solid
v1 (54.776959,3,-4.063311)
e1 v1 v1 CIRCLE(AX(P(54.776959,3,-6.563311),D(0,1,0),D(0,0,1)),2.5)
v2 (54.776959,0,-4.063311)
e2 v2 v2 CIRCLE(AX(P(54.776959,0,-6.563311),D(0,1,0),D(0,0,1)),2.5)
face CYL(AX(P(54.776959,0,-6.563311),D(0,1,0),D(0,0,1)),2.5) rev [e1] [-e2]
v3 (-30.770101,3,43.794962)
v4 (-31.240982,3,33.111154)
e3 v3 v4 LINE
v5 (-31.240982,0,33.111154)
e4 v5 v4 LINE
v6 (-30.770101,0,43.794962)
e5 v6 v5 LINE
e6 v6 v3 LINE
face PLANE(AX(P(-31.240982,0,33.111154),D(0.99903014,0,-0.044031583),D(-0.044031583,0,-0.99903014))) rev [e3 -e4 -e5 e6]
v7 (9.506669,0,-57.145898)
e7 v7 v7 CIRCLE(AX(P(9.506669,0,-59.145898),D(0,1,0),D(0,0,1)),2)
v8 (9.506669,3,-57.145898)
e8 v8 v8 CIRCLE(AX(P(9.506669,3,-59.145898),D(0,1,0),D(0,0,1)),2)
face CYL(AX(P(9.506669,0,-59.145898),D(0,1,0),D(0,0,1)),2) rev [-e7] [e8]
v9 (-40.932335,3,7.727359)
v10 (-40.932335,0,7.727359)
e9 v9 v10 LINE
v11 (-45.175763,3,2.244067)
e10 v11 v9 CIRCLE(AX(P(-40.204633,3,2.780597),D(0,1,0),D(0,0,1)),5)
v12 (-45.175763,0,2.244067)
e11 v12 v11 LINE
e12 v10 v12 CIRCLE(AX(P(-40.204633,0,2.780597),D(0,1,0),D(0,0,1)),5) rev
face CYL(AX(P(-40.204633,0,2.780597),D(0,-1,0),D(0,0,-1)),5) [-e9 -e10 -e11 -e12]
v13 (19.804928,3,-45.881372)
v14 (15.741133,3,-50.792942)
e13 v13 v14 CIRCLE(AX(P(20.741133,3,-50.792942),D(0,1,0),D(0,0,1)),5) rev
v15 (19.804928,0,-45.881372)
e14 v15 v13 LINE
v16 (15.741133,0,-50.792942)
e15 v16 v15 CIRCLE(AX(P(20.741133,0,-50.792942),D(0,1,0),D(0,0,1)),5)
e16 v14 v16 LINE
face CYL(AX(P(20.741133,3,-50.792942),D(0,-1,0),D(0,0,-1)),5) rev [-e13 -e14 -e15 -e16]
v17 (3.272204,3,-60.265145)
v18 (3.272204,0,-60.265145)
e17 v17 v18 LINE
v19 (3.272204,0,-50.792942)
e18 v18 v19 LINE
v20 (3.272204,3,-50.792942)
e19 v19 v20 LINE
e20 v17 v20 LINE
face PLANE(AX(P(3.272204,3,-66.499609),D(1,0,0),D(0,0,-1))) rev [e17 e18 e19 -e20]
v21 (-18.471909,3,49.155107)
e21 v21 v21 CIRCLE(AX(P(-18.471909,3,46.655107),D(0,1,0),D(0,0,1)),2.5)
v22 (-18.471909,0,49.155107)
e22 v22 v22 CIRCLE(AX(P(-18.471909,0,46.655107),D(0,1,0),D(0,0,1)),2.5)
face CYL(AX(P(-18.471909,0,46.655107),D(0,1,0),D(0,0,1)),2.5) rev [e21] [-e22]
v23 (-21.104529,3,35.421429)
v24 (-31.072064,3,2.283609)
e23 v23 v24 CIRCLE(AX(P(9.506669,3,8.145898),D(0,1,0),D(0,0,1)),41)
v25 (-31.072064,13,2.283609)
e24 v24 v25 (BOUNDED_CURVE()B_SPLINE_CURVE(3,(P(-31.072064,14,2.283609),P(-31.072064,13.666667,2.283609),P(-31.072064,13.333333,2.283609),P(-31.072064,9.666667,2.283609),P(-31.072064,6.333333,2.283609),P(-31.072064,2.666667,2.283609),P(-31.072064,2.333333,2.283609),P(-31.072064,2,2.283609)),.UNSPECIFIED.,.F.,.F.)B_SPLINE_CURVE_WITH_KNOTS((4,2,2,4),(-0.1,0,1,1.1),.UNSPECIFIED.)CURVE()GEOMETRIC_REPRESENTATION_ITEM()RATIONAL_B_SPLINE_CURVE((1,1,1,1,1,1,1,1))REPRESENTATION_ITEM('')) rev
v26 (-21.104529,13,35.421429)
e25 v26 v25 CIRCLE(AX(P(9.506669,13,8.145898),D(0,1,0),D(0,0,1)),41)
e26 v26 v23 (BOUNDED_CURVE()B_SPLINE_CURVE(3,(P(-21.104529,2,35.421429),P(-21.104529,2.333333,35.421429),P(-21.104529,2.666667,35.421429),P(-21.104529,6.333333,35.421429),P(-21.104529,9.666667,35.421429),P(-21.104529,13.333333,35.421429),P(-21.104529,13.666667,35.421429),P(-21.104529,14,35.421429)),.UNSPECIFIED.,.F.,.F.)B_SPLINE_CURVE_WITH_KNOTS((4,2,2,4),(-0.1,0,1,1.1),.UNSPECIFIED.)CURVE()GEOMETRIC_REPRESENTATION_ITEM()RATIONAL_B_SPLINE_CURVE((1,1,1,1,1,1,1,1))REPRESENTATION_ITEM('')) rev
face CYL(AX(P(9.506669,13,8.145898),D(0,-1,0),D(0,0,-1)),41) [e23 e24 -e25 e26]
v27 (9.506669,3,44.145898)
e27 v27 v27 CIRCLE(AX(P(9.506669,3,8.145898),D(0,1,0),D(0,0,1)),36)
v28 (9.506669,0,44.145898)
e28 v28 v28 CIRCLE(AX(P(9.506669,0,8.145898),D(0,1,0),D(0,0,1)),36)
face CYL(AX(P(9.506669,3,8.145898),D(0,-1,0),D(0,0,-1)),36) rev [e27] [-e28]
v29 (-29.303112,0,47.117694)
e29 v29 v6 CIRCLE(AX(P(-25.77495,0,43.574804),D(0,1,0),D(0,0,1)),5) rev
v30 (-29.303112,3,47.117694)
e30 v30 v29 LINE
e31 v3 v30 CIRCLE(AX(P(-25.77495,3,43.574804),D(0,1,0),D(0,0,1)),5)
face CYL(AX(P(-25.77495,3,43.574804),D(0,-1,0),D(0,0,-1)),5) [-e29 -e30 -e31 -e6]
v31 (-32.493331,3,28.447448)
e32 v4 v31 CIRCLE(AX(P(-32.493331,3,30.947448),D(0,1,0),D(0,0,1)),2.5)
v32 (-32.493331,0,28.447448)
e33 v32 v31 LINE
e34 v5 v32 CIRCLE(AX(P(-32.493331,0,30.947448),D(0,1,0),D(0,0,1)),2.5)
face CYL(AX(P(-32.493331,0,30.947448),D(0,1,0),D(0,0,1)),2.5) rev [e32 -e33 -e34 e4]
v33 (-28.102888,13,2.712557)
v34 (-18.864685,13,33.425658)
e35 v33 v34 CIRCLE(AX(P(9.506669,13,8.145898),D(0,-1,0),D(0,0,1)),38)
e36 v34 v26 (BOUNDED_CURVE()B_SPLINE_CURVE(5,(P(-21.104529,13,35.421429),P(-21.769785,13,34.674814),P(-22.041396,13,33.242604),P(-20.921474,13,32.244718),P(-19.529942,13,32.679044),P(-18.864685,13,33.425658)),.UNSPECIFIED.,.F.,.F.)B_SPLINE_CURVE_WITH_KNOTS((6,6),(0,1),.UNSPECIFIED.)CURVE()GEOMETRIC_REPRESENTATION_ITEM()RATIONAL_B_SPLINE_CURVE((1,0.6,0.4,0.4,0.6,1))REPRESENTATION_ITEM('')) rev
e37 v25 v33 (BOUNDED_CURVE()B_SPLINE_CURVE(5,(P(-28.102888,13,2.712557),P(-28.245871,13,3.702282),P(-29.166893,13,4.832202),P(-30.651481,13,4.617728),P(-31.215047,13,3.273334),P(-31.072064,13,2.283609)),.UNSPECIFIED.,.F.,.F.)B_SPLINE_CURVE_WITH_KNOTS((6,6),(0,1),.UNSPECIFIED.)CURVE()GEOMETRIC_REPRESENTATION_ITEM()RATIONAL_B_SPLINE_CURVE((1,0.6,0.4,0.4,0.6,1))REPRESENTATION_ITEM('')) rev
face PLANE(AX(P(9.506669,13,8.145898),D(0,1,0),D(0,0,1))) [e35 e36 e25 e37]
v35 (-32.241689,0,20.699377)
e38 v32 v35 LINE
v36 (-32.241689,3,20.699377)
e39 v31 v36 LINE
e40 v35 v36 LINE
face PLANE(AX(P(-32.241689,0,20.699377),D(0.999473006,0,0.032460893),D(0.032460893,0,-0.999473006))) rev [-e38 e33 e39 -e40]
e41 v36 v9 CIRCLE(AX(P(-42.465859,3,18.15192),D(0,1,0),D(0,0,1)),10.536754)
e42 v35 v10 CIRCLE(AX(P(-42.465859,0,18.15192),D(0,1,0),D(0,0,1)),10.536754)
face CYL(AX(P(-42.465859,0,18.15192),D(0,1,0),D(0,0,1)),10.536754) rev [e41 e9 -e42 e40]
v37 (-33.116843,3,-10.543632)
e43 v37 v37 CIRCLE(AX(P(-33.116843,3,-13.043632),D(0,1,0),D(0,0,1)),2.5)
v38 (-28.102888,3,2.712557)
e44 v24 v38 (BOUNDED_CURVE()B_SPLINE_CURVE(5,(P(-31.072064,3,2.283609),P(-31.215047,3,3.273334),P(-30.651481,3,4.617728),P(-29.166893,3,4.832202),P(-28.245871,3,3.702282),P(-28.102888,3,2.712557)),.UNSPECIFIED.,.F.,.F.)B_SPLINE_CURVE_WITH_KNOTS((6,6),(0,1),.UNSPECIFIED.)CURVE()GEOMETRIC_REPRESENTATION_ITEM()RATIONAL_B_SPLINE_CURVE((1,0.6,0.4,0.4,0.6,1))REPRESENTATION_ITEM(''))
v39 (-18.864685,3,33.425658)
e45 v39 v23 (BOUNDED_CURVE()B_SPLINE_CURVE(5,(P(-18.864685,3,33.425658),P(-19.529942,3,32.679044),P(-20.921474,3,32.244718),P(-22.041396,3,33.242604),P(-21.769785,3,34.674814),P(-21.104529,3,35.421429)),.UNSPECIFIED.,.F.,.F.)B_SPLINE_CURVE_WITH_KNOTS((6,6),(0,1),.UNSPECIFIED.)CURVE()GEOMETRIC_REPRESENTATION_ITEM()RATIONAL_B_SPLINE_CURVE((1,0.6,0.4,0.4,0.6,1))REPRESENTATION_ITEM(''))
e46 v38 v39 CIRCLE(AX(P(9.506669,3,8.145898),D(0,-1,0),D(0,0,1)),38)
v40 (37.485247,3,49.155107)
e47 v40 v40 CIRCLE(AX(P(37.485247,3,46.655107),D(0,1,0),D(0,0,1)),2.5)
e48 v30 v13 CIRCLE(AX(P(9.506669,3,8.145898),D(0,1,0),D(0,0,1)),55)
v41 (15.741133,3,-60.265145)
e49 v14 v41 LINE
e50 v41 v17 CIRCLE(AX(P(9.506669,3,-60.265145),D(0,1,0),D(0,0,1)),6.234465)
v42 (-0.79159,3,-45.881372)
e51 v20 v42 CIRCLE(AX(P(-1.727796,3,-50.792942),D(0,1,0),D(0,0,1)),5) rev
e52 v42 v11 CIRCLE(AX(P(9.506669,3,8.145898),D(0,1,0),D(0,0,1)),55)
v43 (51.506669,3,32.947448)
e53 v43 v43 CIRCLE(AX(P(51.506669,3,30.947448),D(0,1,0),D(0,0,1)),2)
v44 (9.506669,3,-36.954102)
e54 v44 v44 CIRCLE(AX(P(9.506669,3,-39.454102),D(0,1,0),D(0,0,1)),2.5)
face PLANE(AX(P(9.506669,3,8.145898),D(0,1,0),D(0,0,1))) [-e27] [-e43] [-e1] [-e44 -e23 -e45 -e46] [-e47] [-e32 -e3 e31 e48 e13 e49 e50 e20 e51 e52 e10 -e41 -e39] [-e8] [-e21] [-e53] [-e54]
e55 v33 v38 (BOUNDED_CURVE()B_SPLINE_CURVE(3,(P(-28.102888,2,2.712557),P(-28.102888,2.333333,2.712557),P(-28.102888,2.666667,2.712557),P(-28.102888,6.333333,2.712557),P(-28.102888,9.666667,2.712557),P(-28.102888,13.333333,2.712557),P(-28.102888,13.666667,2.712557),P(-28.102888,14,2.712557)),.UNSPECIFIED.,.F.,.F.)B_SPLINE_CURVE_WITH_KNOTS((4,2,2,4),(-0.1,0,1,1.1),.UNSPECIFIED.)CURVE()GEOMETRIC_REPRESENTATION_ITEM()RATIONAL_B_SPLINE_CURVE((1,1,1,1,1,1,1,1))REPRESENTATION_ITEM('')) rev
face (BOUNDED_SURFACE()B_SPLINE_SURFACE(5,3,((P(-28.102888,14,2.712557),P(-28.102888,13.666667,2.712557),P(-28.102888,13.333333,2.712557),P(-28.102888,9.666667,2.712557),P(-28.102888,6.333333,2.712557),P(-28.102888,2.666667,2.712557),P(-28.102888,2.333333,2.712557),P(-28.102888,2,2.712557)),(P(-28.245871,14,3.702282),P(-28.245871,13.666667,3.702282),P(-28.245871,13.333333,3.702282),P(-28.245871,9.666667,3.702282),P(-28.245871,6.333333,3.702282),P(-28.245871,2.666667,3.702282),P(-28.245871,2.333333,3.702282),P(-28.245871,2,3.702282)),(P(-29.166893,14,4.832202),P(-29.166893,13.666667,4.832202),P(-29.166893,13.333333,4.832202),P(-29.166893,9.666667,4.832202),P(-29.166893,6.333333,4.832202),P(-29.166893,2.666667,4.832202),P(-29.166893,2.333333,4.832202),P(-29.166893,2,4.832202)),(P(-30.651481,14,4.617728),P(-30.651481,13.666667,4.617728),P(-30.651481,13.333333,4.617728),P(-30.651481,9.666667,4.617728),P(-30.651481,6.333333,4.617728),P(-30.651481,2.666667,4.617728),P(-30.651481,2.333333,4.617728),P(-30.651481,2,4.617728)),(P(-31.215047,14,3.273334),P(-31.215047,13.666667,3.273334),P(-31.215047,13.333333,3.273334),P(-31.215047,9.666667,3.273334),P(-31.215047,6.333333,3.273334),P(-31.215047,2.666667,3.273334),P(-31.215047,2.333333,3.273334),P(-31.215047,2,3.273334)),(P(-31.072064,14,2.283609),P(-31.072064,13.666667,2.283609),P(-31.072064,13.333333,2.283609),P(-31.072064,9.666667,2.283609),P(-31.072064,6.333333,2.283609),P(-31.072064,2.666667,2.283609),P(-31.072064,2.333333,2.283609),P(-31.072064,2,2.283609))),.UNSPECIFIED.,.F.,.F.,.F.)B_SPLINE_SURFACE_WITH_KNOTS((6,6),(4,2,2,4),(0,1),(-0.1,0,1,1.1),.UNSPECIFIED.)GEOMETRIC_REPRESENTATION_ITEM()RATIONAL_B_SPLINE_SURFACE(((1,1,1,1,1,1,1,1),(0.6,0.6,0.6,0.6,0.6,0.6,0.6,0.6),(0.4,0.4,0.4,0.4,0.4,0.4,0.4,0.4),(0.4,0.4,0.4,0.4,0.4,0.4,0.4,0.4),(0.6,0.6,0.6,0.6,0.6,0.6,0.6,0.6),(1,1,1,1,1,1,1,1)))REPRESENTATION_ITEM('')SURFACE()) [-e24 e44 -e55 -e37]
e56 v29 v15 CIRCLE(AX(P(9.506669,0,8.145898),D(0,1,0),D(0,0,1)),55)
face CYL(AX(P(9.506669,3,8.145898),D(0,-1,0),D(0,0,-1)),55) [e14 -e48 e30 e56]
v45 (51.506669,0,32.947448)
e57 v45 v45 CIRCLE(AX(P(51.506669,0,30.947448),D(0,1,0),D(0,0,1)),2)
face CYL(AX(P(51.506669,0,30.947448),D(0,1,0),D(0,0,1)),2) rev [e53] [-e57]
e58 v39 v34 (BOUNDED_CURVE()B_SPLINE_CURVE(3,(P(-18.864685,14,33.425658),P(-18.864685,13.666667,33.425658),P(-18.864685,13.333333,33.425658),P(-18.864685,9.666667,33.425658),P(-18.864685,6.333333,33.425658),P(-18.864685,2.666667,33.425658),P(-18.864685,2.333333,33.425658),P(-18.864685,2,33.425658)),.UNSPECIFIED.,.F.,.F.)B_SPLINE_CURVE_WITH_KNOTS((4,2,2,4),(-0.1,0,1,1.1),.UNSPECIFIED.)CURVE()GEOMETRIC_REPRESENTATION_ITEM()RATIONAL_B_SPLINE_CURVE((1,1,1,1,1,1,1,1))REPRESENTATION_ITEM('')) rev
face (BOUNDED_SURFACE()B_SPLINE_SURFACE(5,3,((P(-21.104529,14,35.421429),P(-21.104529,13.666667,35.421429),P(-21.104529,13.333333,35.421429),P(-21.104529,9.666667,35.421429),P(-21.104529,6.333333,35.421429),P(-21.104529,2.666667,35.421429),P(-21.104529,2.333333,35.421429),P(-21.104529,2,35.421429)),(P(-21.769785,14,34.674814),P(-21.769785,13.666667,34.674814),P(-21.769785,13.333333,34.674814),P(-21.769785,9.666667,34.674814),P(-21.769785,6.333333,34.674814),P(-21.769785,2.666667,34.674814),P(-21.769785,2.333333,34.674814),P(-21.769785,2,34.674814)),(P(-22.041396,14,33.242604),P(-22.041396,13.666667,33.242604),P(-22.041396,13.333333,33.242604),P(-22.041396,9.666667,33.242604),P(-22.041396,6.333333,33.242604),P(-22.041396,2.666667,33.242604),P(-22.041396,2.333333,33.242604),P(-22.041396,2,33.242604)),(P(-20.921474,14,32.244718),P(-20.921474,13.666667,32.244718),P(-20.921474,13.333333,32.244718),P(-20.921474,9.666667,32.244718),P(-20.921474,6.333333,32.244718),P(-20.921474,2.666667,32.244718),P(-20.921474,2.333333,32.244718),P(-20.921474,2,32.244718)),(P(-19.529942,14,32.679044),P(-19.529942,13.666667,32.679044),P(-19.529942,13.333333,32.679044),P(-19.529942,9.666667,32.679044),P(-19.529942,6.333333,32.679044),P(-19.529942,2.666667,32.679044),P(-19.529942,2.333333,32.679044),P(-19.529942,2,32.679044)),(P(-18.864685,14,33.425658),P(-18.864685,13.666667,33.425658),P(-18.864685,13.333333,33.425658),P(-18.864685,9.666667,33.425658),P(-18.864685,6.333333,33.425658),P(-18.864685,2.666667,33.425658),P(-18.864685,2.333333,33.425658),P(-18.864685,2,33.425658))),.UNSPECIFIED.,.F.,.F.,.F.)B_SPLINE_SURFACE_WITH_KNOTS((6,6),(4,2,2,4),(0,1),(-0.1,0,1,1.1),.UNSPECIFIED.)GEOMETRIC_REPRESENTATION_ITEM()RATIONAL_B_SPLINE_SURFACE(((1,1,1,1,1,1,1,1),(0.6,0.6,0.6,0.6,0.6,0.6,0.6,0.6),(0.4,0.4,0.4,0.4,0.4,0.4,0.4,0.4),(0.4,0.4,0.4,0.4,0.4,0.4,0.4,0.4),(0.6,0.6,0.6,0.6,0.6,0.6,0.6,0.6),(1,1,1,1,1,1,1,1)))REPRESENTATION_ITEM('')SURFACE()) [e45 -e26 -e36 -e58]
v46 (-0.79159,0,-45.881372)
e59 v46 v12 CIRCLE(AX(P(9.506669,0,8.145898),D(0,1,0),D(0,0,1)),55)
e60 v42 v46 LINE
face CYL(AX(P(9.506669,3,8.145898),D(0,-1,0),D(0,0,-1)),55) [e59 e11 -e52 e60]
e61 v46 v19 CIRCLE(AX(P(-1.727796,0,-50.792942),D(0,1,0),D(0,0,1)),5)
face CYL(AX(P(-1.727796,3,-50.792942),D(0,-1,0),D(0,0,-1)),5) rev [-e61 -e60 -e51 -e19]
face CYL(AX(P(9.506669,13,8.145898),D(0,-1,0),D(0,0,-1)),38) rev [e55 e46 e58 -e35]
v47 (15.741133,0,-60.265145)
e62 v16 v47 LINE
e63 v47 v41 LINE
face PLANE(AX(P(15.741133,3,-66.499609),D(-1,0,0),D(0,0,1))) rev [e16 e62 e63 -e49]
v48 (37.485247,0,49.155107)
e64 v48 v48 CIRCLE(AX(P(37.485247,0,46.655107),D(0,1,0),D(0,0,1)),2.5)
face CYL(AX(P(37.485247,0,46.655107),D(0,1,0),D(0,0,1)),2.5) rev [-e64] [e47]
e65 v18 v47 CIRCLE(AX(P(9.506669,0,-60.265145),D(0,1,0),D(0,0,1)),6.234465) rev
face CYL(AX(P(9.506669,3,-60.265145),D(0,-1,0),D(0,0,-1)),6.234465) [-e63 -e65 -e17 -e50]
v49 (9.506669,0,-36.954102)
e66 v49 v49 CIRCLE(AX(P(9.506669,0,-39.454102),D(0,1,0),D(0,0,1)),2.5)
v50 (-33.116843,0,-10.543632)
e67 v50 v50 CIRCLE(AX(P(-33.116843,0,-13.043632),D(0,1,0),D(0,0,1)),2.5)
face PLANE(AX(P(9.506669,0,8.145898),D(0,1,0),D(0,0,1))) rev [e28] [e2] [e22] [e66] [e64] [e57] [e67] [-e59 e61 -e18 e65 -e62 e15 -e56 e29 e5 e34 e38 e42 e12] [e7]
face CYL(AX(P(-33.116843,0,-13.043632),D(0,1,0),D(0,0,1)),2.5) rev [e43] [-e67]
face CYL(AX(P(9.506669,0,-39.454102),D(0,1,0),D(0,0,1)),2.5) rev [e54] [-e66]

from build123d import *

# Parameters (mm, degrees)
SKETCH4_R           = 36
BOSS_EXTRUDE1_DEPTH = 3
SKETCH5_R           = 2
SKETCH5_R_2         = 2.5
CUT_EXTRUDE1_DEPTH  = 93.694705096
CUT_EXTRUDE2_DEPTH  = 93.694705096
FILLET1_R           = 5
FILLET2_RADIUS      = 6.234464512
FILLET2_LENGTH      = 3
BOSS_EXTRUDE2_DEPTH = 10
FILLET4_START       = 3
FILLET4_DEPTH       = 11
FILLET5_START       = 3
FILLET5_DEPTH       = 11


with BuildPart() as part:
    # Sketch4 → Boss-Extrude1 (new body)
    with BuildSketch(Plane(origin=(0, 0, 0), x_dir=(1, 0, 0), z_dir=(0, 1, 0))):
        with BuildLine():
            Line((3.272204442, 66.499609121), (15.741133466, 66.499609121))
            Line((15.741133466, 66.499609121), (15.741133466, 46.499609121))
            ThreePointArc((15.741133466, 46.499609121), (9.506668954, -63.145898034), (3.272204442, 46.499609121))
            Line((3.272204442, 46.499609121), (3.272204442, 66.499609121))
        make_face()
        with Locations(Location((9.506668954, -8.145898034, 0), (0, 0, 270))):
            Circle(SKETCH4_R, mode=Mode.SUBTRACT)
    extrude(amount=BOSS_EXTRUDE1_DEPTH)

    # Sketch5 → Cut-Extrude1 (cut, through all)
    with BuildSketch(Plane(origin=(0, 3, 0), x_dir=(1, 0, 0), z_dir=(0, 1, 0))):
        with Locations(Location((9.506668954, 59.145898034, 0), (0, 0, 270))):
            Circle(SKETCH5_R)
        with Locations(Location((9.506668954, 39.454101966, 0), (0, 0, 270))):
            Circle(SKETCH5_R_2)
        with Locations(Location((54.77695913, 6.563310898, 0), (0, 0, 270))):
            Circle(SKETCH5_R_2)
        with Locations(Location((51.506668954, -30.947448364, 0), (0, 0, 270))):
            Circle(SKETCH5_R)
        with Locations(Location((37.485246963, -46.655106966, 0), (0, 0, 270))):
            Circle(SKETCH5_R_2)
        with Locations(Location((-18.471909055, -46.655106966, 0), (0, 0, 270))):
            Circle(SKETCH5_R_2)
        with Locations(Location((-32.493331046, -30.947448364, 0), (0, 0, 270))):
            Circle(SKETCH5_R_2)
        with Locations(Location((-33.116843335, 13.043632404, 0), (0, 0, 270))):
            Circle(SKETCH5_R_2)
    extrude(amount=-CUT_EXTRUDE1_DEPTH, mode=Mode.SUBTRACT)

    # Sketch6 → Cut-Extrude2 (cut, through all)
    with BuildSketch(Plane(origin=(0, 3, 0), x_dir=(1, 0, 0), z_dir=(0, 1, 0))):
        with BuildLine():
            Line((-31.240982332, -33.111154143), (-30.281144407, -54.888863669))
            Line((-30.281144407, -54.888863669), (-55.634525549, -56.00629692))
            Line((-55.634525549, -56.00629692), (-56.656818195, -8.246358342))
            Line((-56.656818195, -8.246358342), (-42.942031477, -7.625931476))
            ThreePointArc((-42.942031477, -7.625931476), (-34.312049589, -11.478197503), (-32.241689114, -20.699376843))
            Line((-32.241689114, -20.699376843), (-32.493331046, -28.447448364))
            ThreePointArc((-32.493331046, -28.447448364), (-30.078867912, -30.299090611), (-31.240982332, -33.111154143))
        make_face()
    extrude(amount=-CUT_EXTRUDE2_DEPTH, mode=Mode.SUBTRACT)

    # Fillet1
    fillet1_edges = [part.edges().sort_by_distance(p)[0] for p in [
        (3.272204442, 1.5, -46.499609121),
        (15.741133466, 1.5, -46.499609121),
        (-30.686613079, 1.5, 45.689207416),
        (-45.491842696, 1.5, 7.741279342),
    ]]
    fillet(fillet1_edges, radius=FILLET1_R)

    # Fillet2: full round fillet: the end face becomes a half cylinder, R = half its width
    fillet2_face = Plane((9.506668954, 1.5, -66.499609121), x_dir=(0, 1, 0), z_dir=(0, 0, -1))  # on the end face: x along it, z out of the body
    fillet2_slab = fillet2_face.offset(-FILLET2_RADIUS / 2) * Box(FILLET2_LENGTH, 2 * FILLET2_RADIUS, FILLET2_RADIUS, mode=Mode.PRIVATE)  # the body's end, R deep
    fillet2_round = Plane((9.506668954, 1.5, -60.265144609), x_dir=(0, 0, -1), z_dir=(0, 1, 0)) * Cylinder(FILLET2_RADIUS, FILLET2_LENGTH, mode=Mode.PRIVATE)  # its axis R under the face
    add(fillet2_slab - fillet2_round, mode=Mode.SUBTRACT)

    # Sketch9 → Boss-Extrude2 (add)
    with BuildSketch(Plane(origin=(0, 3, 0), x_dir=(1, 0, 0), z_dir=(0, 1, 0))):
        with BuildLine():
            Line((-31.282982054, -3.998082872), (-28.266279427, -3.998082872))
            ThreePointArc((-28.266279427, -3.998082872), (46.288733159, 1.397673249), (-21.484606715, -30.135459931))
            Line((-21.484606715, -30.135459931), (-21.484606715, -34.988789689))
            ThreePointArc((-21.484606715, -34.988789689), (48.599268457, 4.214064106), (-31.282982054, -3.998082872))
        make_face()
    extrude(amount=BOSS_EXTRUDE2_DEPTH)

    # Fillet4: read off the stored shape, not the designer's step
    # Fillet4 outline → Fillet4 (cut)
    with BuildSketch(Plane(origin=(0, 0, 0), x_dir=(1, 0, 0), z_dir=(0, 1, 0)).offset(FILLET4_START)):
        with BuildLine():
            ThreePointArc((-21.484606715, -34.988789689), (-21.295327251, -35.205776633), (-21.104528575, -35.421428933))
            add(Edge.make_bspline(
                [(-21.104528575, -35.421428933), (-21.228279098, -35.282544315), (-21.3411007, -35.112745613), (-21.431423393, -34.910535387), (-21.484606706, -34.678162347), (-21.484606715, -34.423543707)],
                knots=[0, 0, 0, 0, 0, 0, 0.275825991, 0.275825991, 0.275825991, 0.275825991, 0.275825991, 0.275825991], degree=5, weights=[1, 0.889669603, 0.794555202, 0.714656797, 0.649974387, 0.600507972]))
            Line((-21.484606715, -34.423543707), (-21.484606715, -34.988789689))
        make_face()
        with BuildLine():
            Line((-21.484606715, -30.135459931), (-21.484606715, -34.423543707))
            add(Edge.make_bspline(
                [(-21.484606715, -34.423543707), (-21.484606746, -33.500313944), (-20.896716335, -32.737133887), (-19.98906503, -32.613765882), (-19.271618069, -32.968959182), (-18.864684854, -33.425658379)],
                knots=[0.275825991, 0.275825991, 0.275825991, 0.275825991, 0.275825991, 0.275825991, 1, 1, 1, 1, 1, 1], degree=5, weights=[0.600507972, 0.47063518, 0.445647986, 0.525546392, 0.710330397, 1]))
            ThreePointArc((-18.864684854, -33.425658379), (-20.22020098, -31.816833883), (-21.484606715, -30.135459931))
        make_face()
    extrude(amount=FILLET4_DEPTH, mode=Mode.SUBTRACT)

    # Fillet5: read off the stored shape, not the designer's step
    # Fillet5 outline → Fillet5 (cut)
    with BuildSketch(Plane(origin=(0, 0, 0), x_dir=(1, 0, 0), z_dir=(0, 1, 0)).offset(FILLET5_START)):
        with BuildLine():
            ThreePointArc((-28.266279427, -3.998082872), (-28.19006415, -3.354623327), (-28.102888392, -2.712556866))
            add(Edge.make_bspline(
                [(-28.102888392, -2.712556866), (-28.151775573, -3.050953664), (-28.302840716, -3.42403045), (-28.598328595, -3.773471224), (-29.047777864, -3.998082872), (-29.587476182, -3.998082872)],
                knots=[0, 0, 0, 0, 0, 0, 0.464069746, 0.464069746, 0.464069746, 0.464069746, 0.464069746, 0.464069746], degree=5, weights=[1, 0.814372102, 0.671816349, 0.572332742, 0.515921281, 0.502581966]))
            Line((-29.587476182, -3.998082872), (-28.266279427, -3.998082872))
        make_face()
        with BuildLine():
            Line((-31.282982054, -3.998082872), (-29.587476182, -3.998082872))
            add(Edge.make_bspline(
                [(-29.587476182, -3.998082872), (-30.247519863, -3.998082872), (-30.77941952, -3.674118257), (-31.063082194, -3.179978591), (-31.130586894, -2.688704223), (-31.072063972, -2.283608879)],
                knots=[0.464069746, 0.464069746, 0.464069746, 0.464069746, 0.464069746, 0.464069746, 1, 1, 1, 1, 1, 1], degree=5, weights=[0.502581966, 0.487177078, 0.529216438, 0.628700044, 0.785627898, 1]))
            ThreePointArc((-31.072063972, -2.283608879), (-31.186553224, -3.13973496), (-31.282982054, -3.998082872))
        make_face()
    extrude(amount=FILLET5_DEPTH, mode=Mode.SUBTRACT)


solid = part.part
